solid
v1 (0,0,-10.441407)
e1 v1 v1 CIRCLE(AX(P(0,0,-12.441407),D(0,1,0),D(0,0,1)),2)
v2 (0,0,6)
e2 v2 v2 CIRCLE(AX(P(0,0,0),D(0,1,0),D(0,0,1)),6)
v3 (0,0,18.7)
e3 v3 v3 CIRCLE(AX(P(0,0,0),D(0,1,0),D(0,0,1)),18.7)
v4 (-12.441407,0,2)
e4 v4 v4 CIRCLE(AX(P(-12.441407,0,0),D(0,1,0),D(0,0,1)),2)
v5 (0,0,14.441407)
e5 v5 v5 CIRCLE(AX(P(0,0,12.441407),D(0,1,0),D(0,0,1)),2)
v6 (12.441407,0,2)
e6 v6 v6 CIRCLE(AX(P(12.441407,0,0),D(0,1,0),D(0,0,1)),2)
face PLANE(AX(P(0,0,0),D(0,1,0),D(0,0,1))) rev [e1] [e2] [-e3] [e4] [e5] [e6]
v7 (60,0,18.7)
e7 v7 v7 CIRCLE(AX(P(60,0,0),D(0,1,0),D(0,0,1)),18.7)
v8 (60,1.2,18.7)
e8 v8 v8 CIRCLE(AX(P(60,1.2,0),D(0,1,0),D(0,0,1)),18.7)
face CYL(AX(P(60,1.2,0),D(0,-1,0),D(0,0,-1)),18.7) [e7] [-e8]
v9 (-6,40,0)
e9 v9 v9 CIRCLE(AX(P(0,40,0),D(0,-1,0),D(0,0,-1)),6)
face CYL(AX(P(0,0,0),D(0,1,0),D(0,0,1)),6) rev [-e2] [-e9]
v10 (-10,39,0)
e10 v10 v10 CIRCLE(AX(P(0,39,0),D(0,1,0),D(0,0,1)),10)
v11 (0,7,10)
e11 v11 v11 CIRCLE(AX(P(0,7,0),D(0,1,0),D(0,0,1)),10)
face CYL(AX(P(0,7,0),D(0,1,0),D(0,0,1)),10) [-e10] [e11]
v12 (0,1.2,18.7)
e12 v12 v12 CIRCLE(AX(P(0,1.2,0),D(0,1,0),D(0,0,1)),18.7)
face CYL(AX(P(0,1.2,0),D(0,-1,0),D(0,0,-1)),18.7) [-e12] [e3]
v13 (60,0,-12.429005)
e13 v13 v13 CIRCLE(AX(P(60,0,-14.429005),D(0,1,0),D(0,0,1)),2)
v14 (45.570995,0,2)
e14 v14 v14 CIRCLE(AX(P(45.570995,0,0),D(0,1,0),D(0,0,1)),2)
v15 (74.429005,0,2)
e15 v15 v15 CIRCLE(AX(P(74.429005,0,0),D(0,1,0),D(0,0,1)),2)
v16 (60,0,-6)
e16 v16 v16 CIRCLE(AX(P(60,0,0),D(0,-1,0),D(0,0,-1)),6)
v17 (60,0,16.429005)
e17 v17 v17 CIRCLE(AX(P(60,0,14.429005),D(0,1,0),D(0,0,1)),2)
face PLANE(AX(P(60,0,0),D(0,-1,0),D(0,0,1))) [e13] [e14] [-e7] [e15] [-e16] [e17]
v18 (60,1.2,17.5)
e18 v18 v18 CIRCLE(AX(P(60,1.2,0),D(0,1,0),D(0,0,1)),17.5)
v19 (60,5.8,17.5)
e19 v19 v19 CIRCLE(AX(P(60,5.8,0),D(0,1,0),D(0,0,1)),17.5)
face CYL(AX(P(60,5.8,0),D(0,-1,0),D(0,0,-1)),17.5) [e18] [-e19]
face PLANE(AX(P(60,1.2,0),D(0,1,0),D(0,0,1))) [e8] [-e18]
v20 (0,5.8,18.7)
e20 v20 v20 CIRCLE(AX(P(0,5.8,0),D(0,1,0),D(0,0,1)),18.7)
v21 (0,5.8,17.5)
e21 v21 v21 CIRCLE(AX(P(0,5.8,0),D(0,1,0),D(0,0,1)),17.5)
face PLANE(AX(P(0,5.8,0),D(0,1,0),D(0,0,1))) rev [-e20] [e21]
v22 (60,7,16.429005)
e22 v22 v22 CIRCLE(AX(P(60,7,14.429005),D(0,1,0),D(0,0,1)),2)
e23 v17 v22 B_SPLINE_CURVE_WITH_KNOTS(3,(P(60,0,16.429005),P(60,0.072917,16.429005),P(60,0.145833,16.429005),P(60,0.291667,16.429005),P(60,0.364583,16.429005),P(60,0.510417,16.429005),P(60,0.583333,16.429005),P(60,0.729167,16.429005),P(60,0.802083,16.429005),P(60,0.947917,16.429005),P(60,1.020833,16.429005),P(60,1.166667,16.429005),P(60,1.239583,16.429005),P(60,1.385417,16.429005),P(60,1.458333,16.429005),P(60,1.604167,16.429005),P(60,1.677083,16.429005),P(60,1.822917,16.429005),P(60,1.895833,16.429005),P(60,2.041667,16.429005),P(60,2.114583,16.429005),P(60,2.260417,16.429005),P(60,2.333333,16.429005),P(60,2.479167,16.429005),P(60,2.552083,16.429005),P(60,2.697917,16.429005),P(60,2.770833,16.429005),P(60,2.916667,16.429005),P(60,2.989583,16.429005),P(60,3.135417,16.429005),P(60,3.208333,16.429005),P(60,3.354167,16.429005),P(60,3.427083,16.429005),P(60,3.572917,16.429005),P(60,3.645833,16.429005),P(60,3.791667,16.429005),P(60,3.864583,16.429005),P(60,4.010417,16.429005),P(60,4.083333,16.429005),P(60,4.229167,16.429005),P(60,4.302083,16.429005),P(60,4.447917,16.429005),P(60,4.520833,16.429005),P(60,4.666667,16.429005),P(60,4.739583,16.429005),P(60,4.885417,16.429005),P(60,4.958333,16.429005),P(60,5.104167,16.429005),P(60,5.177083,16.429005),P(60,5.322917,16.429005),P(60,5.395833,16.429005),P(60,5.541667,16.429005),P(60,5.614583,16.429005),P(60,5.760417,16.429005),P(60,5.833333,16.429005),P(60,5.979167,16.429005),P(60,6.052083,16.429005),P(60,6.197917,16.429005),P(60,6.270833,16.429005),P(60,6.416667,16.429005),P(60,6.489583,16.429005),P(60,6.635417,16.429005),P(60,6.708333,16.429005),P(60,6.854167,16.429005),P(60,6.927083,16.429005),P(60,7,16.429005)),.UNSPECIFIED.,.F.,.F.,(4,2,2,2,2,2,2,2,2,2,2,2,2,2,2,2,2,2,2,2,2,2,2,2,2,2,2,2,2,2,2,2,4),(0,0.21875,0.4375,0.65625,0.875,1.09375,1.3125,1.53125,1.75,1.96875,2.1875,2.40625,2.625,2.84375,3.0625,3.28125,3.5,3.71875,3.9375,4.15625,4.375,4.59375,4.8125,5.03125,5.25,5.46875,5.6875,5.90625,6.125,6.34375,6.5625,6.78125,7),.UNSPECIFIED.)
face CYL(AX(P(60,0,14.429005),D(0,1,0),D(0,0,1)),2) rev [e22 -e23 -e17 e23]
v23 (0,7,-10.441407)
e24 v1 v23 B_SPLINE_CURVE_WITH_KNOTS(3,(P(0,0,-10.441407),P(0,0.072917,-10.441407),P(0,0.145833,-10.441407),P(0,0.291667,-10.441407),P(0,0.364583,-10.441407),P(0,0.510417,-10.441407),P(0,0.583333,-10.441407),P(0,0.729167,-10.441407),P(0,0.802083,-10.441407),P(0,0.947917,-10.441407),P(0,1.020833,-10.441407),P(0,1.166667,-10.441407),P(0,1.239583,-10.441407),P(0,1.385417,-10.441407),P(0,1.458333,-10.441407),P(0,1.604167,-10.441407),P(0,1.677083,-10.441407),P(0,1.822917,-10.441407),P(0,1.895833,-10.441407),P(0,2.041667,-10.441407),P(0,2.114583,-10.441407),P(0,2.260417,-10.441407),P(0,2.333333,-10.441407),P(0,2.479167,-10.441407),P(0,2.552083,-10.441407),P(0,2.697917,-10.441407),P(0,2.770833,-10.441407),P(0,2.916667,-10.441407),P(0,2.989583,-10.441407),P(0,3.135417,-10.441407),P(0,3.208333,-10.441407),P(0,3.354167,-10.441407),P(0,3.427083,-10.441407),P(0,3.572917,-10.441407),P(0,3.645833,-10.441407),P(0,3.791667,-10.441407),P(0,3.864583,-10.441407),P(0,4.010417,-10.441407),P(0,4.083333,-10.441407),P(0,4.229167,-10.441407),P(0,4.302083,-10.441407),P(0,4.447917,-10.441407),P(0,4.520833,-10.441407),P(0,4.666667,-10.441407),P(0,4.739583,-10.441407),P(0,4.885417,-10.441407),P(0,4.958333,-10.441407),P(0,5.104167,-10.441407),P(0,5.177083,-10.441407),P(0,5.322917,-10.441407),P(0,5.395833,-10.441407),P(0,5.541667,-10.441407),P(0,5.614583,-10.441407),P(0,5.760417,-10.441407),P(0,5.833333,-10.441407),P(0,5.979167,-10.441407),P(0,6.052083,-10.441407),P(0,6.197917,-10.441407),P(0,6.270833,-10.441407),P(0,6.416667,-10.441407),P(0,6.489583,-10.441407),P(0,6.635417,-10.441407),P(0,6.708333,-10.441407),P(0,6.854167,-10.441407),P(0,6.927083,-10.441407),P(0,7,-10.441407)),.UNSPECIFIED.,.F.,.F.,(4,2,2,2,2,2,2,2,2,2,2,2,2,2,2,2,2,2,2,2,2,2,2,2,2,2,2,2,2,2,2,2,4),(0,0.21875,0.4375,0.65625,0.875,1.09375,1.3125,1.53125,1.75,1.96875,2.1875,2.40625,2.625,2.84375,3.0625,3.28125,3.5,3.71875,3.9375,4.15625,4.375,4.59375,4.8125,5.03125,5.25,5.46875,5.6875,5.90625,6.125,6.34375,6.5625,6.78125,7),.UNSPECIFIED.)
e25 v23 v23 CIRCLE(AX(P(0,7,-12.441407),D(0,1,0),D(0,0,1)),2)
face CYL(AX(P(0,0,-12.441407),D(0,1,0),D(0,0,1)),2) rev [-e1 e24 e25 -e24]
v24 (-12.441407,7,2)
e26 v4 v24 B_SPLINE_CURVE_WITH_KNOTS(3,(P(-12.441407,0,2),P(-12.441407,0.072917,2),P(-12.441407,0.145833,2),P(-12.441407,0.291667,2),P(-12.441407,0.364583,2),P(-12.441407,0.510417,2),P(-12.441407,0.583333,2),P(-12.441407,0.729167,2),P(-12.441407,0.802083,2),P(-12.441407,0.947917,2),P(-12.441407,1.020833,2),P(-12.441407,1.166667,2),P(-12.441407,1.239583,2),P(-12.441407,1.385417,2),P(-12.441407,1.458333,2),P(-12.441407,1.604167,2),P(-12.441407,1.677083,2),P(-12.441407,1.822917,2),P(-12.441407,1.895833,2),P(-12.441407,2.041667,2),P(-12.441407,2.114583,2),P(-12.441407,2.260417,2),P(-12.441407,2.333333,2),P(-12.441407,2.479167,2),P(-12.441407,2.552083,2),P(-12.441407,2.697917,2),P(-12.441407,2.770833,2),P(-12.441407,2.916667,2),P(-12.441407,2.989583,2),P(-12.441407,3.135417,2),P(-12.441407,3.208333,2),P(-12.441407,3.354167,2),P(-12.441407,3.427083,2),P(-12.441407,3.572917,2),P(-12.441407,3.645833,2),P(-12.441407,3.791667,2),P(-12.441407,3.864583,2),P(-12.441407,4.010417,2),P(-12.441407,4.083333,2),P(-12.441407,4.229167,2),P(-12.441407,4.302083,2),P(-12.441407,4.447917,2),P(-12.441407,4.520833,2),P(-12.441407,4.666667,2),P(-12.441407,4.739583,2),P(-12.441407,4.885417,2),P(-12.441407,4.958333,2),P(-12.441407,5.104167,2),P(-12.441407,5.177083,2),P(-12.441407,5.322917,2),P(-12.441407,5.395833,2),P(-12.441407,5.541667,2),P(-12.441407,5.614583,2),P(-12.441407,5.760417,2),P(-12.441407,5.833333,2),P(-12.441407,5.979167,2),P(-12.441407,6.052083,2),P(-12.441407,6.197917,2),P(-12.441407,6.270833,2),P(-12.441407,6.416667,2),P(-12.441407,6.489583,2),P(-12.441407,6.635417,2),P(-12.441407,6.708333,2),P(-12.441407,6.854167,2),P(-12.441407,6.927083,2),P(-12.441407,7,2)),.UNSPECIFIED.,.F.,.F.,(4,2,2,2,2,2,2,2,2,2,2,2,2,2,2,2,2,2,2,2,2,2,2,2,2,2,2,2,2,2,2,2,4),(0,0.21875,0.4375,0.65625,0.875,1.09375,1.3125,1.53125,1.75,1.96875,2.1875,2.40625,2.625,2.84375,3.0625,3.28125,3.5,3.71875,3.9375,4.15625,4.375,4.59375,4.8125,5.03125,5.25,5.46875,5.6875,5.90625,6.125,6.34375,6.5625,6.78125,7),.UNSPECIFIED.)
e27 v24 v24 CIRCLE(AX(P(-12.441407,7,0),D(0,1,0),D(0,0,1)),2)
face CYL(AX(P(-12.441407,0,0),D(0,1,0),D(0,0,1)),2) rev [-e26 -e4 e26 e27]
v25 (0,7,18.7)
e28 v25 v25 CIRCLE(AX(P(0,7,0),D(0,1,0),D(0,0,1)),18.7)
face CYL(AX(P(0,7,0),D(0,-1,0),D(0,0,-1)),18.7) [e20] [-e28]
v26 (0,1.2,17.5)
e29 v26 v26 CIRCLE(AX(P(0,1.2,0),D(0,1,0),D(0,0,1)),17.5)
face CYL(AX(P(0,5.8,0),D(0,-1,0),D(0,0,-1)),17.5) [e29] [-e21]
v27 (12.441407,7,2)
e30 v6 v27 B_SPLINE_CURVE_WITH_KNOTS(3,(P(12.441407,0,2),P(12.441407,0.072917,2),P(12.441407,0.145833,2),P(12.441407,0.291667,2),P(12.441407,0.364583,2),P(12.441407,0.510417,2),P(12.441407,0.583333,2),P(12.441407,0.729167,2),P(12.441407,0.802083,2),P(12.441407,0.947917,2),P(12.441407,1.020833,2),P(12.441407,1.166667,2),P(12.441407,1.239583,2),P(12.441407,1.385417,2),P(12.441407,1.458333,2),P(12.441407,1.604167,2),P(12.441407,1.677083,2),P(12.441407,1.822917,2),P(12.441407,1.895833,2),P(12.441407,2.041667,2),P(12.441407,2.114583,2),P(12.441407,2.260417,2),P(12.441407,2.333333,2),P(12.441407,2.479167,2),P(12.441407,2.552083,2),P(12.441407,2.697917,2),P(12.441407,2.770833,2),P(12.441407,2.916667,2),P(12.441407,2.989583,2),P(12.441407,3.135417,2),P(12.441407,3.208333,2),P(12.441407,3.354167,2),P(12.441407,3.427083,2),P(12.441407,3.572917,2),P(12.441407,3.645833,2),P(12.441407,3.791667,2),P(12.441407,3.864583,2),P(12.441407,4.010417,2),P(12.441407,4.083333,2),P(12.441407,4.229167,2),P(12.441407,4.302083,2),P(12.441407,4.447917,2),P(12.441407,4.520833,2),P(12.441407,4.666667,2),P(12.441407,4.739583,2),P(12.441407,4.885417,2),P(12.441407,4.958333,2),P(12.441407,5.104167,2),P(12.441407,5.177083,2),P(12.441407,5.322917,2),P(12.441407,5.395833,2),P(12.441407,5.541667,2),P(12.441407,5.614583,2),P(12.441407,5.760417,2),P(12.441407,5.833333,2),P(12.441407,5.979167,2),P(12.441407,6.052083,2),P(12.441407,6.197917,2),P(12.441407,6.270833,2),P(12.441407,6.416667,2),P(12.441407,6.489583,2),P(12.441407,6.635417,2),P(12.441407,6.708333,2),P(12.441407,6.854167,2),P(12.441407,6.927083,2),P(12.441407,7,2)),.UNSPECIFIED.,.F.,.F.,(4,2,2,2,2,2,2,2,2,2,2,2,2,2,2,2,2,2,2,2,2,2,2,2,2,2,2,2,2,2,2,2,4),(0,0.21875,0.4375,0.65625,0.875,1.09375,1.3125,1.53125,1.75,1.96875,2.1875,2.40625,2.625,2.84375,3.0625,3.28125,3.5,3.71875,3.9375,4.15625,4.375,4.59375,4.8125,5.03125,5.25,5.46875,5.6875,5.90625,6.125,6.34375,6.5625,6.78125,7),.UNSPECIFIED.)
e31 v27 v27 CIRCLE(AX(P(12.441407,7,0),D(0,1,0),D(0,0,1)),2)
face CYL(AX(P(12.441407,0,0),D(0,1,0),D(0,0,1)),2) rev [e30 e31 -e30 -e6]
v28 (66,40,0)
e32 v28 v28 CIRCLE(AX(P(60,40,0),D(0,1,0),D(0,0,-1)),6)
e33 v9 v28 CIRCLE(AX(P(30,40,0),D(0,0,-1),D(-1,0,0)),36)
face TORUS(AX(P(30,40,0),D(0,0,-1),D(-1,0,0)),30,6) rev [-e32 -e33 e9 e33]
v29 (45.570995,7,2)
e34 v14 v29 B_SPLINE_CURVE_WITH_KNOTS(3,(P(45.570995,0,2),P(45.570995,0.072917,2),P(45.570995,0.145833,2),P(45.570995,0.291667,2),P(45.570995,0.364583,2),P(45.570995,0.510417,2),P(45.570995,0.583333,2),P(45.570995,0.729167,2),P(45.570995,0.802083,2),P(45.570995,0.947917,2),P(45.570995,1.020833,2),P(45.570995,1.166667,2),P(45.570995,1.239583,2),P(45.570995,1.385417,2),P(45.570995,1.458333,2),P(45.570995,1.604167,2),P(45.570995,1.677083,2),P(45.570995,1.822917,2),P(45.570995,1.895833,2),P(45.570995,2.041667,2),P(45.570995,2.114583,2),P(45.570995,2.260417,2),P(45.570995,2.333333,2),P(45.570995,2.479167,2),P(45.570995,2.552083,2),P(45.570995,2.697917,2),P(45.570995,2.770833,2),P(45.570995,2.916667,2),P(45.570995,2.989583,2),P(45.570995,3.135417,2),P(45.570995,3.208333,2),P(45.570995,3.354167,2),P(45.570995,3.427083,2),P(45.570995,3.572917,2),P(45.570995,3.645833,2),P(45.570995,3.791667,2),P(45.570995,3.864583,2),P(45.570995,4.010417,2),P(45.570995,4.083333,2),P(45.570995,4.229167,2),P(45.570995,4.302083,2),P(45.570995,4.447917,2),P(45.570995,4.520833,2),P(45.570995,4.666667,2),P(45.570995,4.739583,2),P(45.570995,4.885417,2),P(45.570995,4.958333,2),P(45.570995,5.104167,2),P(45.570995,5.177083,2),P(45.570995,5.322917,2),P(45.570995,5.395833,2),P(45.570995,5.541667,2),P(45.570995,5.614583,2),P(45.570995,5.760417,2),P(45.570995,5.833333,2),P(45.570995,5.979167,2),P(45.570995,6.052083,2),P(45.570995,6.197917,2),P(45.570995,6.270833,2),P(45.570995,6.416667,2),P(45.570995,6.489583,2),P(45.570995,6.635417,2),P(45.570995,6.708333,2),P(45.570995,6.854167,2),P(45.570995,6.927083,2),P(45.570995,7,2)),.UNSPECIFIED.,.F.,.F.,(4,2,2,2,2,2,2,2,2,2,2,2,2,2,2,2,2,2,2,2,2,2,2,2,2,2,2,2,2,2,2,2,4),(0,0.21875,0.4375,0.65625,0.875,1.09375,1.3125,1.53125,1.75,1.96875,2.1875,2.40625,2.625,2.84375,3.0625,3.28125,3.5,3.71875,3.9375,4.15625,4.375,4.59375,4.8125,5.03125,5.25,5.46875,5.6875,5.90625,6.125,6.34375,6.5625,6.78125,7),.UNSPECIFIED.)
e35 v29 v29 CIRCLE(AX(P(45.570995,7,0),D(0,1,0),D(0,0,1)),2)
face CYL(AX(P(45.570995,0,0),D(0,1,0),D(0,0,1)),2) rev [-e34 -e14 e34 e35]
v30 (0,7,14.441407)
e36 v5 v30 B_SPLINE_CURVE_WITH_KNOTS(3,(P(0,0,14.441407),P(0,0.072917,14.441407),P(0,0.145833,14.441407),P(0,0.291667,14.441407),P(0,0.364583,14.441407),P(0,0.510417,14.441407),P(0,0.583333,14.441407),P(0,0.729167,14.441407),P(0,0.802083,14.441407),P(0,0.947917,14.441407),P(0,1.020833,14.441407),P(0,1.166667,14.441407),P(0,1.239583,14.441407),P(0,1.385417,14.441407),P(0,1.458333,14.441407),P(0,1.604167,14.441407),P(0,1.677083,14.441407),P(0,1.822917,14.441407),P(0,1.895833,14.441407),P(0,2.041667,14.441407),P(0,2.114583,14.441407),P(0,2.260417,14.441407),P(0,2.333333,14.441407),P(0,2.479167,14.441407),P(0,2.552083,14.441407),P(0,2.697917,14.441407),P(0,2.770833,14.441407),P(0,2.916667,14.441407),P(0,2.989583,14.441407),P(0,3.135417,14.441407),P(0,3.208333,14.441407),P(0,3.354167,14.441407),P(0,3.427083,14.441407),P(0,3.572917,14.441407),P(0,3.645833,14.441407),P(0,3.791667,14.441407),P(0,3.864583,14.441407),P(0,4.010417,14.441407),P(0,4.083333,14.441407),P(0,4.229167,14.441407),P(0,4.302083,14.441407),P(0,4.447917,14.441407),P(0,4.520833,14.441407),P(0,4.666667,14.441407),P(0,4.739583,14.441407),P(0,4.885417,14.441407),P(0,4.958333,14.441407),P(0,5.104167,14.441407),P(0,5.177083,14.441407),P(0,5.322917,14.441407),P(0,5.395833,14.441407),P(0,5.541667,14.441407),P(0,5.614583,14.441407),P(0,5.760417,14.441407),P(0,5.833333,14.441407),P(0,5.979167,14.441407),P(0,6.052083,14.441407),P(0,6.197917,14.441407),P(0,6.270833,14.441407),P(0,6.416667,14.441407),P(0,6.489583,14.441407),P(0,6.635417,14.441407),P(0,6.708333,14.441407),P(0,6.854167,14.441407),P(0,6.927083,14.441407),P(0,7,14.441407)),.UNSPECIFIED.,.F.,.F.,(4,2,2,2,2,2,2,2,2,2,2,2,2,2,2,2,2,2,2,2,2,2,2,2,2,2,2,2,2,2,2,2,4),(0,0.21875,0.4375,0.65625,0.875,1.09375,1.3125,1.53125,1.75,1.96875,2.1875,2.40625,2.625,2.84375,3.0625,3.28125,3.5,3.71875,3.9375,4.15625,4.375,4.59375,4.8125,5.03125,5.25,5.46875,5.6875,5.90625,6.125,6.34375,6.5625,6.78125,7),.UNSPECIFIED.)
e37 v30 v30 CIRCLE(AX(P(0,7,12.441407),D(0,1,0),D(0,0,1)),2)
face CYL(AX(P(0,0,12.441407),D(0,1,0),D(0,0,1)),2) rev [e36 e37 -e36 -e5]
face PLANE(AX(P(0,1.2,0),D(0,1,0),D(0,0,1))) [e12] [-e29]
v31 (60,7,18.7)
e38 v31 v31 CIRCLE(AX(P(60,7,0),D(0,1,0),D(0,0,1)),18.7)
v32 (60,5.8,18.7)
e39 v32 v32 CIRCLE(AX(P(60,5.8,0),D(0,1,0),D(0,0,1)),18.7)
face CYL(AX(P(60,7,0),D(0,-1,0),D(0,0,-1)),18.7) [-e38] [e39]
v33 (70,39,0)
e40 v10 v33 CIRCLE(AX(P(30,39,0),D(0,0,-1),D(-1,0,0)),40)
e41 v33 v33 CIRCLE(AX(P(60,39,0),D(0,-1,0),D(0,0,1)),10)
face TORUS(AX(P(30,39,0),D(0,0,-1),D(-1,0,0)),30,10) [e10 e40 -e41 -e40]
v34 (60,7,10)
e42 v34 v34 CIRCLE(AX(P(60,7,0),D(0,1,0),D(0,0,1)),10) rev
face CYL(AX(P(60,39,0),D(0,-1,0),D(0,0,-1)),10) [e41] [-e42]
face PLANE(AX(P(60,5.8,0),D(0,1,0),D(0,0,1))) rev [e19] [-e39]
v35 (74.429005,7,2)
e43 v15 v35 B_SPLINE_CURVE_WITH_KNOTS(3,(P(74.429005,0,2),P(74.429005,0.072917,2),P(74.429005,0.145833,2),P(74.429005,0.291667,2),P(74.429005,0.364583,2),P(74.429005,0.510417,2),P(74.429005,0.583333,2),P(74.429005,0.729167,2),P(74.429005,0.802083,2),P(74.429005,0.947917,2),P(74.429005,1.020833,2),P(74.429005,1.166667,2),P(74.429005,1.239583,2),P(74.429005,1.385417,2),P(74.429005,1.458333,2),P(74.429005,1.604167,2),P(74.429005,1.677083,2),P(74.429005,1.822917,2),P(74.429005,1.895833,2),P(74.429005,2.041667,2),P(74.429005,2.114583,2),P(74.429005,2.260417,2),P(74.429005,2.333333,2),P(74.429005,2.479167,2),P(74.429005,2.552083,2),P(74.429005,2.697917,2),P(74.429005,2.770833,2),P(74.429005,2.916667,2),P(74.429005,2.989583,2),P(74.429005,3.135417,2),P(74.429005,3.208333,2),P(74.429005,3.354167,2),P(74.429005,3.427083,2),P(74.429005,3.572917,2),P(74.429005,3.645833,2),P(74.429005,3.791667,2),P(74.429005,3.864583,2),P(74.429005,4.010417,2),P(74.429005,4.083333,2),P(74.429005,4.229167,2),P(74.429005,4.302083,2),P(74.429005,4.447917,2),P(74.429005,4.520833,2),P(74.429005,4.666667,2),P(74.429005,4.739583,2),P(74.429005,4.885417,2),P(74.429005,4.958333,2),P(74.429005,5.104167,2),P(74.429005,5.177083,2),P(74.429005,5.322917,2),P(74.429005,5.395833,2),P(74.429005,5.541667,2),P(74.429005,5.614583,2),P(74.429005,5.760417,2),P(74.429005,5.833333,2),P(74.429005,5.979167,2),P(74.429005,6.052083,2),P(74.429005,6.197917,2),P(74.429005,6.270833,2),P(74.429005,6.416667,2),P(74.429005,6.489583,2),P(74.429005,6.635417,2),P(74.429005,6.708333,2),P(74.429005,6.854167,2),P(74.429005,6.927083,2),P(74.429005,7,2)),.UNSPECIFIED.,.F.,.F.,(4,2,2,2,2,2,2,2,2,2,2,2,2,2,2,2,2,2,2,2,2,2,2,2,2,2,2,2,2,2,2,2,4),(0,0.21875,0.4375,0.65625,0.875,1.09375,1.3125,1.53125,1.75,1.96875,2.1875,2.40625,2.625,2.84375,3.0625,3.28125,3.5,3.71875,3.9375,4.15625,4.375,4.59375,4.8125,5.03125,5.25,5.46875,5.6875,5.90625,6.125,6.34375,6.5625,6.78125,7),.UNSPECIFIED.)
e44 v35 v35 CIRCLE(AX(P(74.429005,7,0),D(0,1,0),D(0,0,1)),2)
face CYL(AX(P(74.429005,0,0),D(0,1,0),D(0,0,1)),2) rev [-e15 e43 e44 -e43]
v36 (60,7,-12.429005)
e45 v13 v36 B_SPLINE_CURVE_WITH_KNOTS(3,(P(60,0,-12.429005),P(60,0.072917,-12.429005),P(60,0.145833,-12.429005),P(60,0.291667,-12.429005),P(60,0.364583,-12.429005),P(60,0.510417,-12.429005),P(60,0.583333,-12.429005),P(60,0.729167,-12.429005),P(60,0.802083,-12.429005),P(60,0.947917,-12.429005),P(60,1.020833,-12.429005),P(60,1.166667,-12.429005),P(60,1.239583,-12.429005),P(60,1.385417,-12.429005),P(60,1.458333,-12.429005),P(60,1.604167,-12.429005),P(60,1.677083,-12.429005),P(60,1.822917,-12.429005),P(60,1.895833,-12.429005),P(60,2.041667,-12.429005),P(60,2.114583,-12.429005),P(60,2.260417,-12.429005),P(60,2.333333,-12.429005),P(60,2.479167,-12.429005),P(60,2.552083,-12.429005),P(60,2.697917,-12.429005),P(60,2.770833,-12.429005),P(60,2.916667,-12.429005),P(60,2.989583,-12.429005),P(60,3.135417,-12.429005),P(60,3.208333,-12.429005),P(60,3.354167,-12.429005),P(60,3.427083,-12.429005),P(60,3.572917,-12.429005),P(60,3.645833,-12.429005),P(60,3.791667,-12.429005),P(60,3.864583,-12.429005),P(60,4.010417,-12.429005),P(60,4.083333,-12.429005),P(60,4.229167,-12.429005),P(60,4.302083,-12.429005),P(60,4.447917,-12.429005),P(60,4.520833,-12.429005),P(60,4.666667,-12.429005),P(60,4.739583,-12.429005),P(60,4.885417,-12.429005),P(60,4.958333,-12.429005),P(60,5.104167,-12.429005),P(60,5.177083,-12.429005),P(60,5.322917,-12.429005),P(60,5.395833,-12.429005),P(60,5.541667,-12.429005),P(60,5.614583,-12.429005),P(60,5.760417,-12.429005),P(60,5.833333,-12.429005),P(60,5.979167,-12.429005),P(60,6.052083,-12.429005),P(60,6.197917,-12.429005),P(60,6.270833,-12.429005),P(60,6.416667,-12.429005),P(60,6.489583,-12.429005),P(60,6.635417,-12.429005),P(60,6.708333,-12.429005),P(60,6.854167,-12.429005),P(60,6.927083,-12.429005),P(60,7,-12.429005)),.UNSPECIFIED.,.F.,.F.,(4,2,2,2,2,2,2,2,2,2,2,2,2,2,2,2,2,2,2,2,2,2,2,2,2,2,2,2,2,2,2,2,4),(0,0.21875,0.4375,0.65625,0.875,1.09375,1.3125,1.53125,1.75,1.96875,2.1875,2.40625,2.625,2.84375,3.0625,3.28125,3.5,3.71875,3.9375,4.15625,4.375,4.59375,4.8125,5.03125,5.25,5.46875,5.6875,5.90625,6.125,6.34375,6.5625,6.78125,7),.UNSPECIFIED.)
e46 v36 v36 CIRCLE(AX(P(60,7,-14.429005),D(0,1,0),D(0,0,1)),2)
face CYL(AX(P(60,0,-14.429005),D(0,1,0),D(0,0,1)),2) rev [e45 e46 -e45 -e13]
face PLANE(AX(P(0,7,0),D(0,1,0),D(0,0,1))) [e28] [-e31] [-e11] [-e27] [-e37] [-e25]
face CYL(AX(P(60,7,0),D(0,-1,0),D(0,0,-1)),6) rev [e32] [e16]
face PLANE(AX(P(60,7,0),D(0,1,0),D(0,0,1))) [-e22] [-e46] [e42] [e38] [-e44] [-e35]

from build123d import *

# Parameters (mm, degrees)
SKETCH3_R             = 18.7
BOSS_EXTRUDE1_DEPTH   = 1.2
BOSS_EXTRUDE1_2_DEPTH = 1.2
SKETCH4_R             = 17.5
BOSS_EXTRUDE2_DEPTH   = 4.6
SKETCH5_R             = 18.7
BOSS_EXTRUDE3_DEPTH   = 1.2
SKETCH6_R             = 2
CUT_EXTRUDE1_DEPTH    = 82.193472644
SKETCH7_R             = 6
CUT_EXTRUDE2_DEPTH    = 82.193472644
SWEEP4_START          = 7
SWEEP4_OUTLINE_R      = 10
SWEEP4_DEPTH          = 32
SWEEP4_2_OUTLINE_R    = 6
SWEEP4_2_DEPTH        = 7
SWEEP4_3_OUTLINE_R    = 10
SWEEP4_3_ANGLE        = 180
SKETCH10_R            = 6
CUT_EXTRUDE3_DEPTH    = 7
SKETCH11_R            = 6


with BuildPart() as part:
    # Sketch3 → Boss-Extrude1 (new body)
    with BuildSketch(Plane(origin=(0, 0, 0), x_dir=(1, 0, 0), z_dir=(0, 1, 0))):
        with Locations(Location((0, 0, 0), (0, 0, 270))):
            Circle(SKETCH3_R)
    extrude(amount=BOSS_EXTRUDE1_DEPTH)



with BuildPart() as body_2:
    # Sketch3 → Boss-Extrude1 2 (new body)
    with BuildSketch(Plane(origin=(0, 0, 0), x_dir=(1, 0, 0), z_dir=(0, 1, 0))):
        with Locations(Location((60, 0, 0), (0, 0, 270))):
            Circle(SKETCH3_R)
    extrude(amount=BOSS_EXTRUDE1_2_DEPTH)


with BuildPart() as part_1:
    add(part.part)

    add(body_2.part)  # Boss-Extrude2 merges body 2
    # Sketch4 → Boss-Extrude2 (add)
    with BuildSketch(Plane(origin=(0, 1.2, 0), x_dir=(1, 0, 0), z_dir=(0, 1, 0))):
        with Locations(Location((0, 0, 0), (0, 0, 270))):
            Circle(SKETCH4_R)
        with Locations(Location((60, 0, 0), (0, 0, 270))):
            Circle(SKETCH4_R)
    extrude(amount=BOSS_EXTRUDE2_DEPTH)

    # Sketch5 → Boss-Extrude3 (add)
    with BuildSketch(Plane(origin=(0, 5.8, 0), x_dir=(1, 0, 0), z_dir=(0, 1, 0))):
        with Locations(Location((0, 0, 0), (0, 0, 270))):
            Circle(SKETCH5_R)
        with Locations(Location((60, 0, 0), (0, 0, 270))):
            Circle(SKETCH5_R)
    extrude(amount=BOSS_EXTRUDE3_DEPTH)

    # Sketch6 → Cut-Extrude1 (cut, through all)
    with BuildSketch(Plane(origin=(0, 7, 0), x_dir=(1, 0, 0), z_dir=(0, 1, 0))):
        with Locations(Location((0, 12.441407295, 0), (0, 0, 270))):
            Circle(SKETCH6_R)
        with Locations(Location((12.441407295, 0, 0), (0, 0, 270))):
            Circle(SKETCH6_R)
        with Locations(Location((0, -12.441407295, 0), (0, 0, 270))):
            Circle(SKETCH6_R)
        with Locations(Location((-12.441407295, 0, 0), (0, 0, 270))):
            Circle(SKETCH6_R)
        with Locations(Location((45.570995446, 0, 0), (0, 0, 270))):
            Circle(SKETCH6_R)
        with Locations(Location((60, 14.429004554, 0), (0, 0, 270))):
            Circle(SKETCH6_R)
        with Locations(Location((74.429004554, 0, 0), (0, 0, 270))):
            Circle(SKETCH6_R)
        with Locations(Location((60, -14.429004554, 0), (0, 0, 270))):
            Circle(SKETCH6_R)
    extrude(amount=-CUT_EXTRUDE1_DEPTH, mode=Mode.SUBTRACT)

    # Sketch7 → Cut-Extrude2 (cut, through all)
    with BuildSketch(Plane(origin=(0, 7, 0), x_dir=(1, 0, 0), z_dir=(0, 1, 0))):
        with Locations(Location((0, 0, 0), (0, 0, 270))):
            Circle(SKETCH7_R)
        with Locations(Location((60, 0, 0), (0, 0, 270))):
            Circle(SKETCH7_R)
    extrude(amount=-CUT_EXTRUDE2_DEPTH, mode=Mode.SUBTRACT)

    # Sweep4: read off the stored shape, not the designer's step
    # Sweep4 outline → Sweep4 (add)
    with BuildSketch(Plane(origin=(0, 0, 0), x_dir=(1, 0, 0), z_dir=(0, 1, 0)).offset(SWEEP4_START)):
        with Locations((60, 0)):
            Circle(SWEEP4_OUTLINE_R)
        Circle(SWEEP4_OUTLINE_R)
    extrude(amount=SWEEP4_DEPTH)

    # Sweep4 2 outline → Sweep4 2 (add)
    with BuildSketch(Plane(origin=(0, 0, 0), x_dir=(1, 0, 0), z_dir=(0, 1, 0))):
        with Locations((60, 0)):
            Circle(SWEEP4_2_OUTLINE_R)
    extrude(amount=SWEEP4_2_DEPTH)

    # Sweep4 3 outline → Sweep4 3 (revolve)
    with BuildSketch(Plane(origin=(30, 39, 0), x_dir=(1, 0, 0), z_dir=(0, -1, 0))):
        with Locations((30, 0)):
            Circle(SWEEP4_3_OUTLINE_R)
    revolve(axis=Axis((30, 39, 0), (0, 0, 1)), revolution_arc=SWEEP4_3_ANGLE)

    # Sketch10 → Cut-Extrude3 (cut)
    with BuildSketch(Plane(origin=(0, 0, 0), x_dir=(-1, 0, 0), z_dir=(0, -1, 0))):
        with Locations(Location((-60, 0, 0), (0, 0, 90))):
            Circle(SKETCH10_R)
    extrude(amount=-CUT_EXTRUDE3_DEPTH, mode=Mode.SUBTRACT)

    # Cut-Sweep3: sweep along a path in Sketch12
    with BuildLine(Plane.XY) as cut_sweep3_path:
        Line((0, 7), (0, 40))
        ThreePointArc((0, 40), (30, 70), (60, 40))
        Line((60, 40), (60, 7))
    # Sketch11 → Cut-Sweep3 (sweep, cut)
    with BuildSketch(Plane.XZ.offset(-7)):
        Circle(SKETCH11_R)
    sweep(path=cut_sweep3_path.line, mode=Mode.SUBTRACT)


solid = part_1.part
